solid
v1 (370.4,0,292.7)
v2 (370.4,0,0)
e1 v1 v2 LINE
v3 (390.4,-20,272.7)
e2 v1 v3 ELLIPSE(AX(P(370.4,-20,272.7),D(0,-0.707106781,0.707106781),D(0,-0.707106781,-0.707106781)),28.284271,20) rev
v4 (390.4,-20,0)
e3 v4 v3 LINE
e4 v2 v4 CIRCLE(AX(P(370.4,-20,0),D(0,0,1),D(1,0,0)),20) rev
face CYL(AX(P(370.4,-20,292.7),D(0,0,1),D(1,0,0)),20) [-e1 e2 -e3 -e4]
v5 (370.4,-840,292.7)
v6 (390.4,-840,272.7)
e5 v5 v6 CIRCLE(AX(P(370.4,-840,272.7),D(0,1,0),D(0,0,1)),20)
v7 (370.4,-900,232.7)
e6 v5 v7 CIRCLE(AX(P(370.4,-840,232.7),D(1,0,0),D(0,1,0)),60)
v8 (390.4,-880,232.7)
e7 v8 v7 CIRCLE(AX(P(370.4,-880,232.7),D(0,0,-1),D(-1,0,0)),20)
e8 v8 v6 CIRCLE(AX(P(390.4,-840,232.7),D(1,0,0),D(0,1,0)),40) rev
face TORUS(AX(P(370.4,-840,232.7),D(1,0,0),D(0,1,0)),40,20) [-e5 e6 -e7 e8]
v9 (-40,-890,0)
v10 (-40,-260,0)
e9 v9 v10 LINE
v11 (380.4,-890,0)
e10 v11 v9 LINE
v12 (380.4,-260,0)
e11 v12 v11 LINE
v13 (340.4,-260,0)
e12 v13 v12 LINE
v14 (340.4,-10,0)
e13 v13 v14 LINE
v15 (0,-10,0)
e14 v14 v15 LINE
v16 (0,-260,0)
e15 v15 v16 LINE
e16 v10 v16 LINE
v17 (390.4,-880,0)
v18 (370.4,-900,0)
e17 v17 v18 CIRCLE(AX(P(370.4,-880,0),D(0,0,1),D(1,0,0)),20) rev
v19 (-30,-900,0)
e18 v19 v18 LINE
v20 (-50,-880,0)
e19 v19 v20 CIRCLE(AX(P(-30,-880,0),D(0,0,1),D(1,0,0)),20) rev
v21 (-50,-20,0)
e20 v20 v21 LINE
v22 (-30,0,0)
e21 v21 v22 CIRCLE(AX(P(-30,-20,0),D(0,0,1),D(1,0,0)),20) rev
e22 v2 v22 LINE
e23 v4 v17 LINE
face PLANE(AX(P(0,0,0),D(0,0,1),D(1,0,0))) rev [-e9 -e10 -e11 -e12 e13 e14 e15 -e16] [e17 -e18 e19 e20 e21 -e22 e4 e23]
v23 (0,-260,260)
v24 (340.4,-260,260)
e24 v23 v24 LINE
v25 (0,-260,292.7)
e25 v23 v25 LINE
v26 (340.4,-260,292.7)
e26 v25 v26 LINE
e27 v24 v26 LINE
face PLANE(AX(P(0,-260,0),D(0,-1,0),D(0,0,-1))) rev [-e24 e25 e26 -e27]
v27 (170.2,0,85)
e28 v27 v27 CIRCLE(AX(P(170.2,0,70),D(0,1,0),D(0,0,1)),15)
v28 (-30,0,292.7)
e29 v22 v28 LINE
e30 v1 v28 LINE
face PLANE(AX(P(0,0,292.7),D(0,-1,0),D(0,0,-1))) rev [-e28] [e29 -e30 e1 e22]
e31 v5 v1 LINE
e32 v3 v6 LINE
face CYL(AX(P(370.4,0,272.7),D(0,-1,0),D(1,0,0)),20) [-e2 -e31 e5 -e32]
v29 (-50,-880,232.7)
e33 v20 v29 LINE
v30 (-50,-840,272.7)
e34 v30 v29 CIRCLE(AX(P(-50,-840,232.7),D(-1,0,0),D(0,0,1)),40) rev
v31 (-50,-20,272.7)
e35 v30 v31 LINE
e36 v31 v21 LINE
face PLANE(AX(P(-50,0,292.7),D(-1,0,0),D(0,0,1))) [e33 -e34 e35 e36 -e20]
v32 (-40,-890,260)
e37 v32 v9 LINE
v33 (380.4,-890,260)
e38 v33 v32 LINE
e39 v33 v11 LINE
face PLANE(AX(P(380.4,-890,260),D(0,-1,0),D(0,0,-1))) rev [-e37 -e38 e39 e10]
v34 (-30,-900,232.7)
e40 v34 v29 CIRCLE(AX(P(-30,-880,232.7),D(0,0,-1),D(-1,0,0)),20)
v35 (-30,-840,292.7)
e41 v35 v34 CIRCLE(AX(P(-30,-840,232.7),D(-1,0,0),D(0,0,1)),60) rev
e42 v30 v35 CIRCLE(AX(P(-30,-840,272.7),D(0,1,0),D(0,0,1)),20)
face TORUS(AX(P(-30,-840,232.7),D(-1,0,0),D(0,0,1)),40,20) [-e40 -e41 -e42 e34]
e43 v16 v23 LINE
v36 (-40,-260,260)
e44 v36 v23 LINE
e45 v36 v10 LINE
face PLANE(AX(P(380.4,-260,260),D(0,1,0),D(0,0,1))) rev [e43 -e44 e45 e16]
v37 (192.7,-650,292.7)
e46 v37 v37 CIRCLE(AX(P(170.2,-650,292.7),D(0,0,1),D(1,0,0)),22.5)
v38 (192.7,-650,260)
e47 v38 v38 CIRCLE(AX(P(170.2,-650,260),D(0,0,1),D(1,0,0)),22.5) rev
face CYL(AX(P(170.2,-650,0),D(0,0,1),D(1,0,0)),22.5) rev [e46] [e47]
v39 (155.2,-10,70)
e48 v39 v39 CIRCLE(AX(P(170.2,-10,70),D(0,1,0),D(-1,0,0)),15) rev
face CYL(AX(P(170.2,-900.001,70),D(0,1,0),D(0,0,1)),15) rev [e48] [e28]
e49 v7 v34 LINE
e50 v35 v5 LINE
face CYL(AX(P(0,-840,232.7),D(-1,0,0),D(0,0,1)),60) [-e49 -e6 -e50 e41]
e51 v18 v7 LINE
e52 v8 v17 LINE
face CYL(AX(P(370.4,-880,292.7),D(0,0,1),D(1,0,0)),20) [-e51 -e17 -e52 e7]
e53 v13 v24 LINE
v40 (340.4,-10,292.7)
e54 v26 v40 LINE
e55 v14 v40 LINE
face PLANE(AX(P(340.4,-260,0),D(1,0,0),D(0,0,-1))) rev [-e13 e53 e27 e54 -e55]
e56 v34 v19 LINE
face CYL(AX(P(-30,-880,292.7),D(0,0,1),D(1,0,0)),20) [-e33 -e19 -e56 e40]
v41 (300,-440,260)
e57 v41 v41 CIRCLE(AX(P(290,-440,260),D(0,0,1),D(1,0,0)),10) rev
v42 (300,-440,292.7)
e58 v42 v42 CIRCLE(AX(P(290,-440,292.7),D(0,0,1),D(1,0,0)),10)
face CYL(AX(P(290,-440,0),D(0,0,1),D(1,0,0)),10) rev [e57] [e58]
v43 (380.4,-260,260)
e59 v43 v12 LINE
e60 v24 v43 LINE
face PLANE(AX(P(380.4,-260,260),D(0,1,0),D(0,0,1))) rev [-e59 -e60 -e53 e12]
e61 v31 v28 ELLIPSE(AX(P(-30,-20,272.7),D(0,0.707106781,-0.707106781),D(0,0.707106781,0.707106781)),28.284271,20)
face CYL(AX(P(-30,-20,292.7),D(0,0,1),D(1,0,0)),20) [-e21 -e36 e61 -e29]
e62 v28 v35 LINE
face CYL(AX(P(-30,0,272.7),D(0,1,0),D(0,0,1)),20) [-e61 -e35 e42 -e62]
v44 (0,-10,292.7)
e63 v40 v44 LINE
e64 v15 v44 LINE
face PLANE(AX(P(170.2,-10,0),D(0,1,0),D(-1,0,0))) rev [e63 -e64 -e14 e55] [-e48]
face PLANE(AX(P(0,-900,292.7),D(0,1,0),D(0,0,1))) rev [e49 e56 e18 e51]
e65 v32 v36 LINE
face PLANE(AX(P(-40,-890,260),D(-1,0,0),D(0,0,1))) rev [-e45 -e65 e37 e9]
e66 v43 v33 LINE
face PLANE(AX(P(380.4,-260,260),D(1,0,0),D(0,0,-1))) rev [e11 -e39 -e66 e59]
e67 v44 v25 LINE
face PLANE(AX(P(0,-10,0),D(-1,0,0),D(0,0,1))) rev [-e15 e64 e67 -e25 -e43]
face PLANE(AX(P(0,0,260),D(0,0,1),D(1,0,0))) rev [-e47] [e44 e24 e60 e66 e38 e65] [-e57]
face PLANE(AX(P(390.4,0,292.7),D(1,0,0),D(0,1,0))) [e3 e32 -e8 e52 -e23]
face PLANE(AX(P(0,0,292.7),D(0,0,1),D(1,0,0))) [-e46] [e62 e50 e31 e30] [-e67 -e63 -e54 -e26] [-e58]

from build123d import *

# Parameters (mm, degrees)
SKETCH_1_W               = 340.4
SKETCH_1_H               = 900
EXTRUDE_1_DEPTH          = 292.7
SKETCH_2_R               = 22.5
CUT_EXTRUDE_1_DEPTH      = 1006.756158321
SKETCH_3_W               = 50
SKETCH_3_H               = 900
EXTRUDE_2_DEPTH          = 292.7
FILLET_9_R               = 20
FILLET_10_R              = 60
CUT_EXTRUDE_3_DEPTH      = 1024.760445612
CUT_EXTRUDE_3_DEPTH_BACK = 1024.760445612
SKETCH_5_R               = 10
CUT_EXTRUDE_4_REACH      = 1025.76
CUT_EXTRUDE_4_END_RADIUS = 22.5
SKETCH_6_R               = 15
SKETCH_7_W               = 420.4
SKETCH_7_H               = 630
CUT_EXTRUDE_6_DEPTH      = 260
CUT_EXTRUDE_7_DEPTH      = 1024.760445612


with BuildPart() as part:
    # 草图1 → 凸台-拉伸1 (new body)
    with BuildSketch(Plane.XY):
        with Locations((170.2, -450)):
            Rectangle(SKETCH_1_W, SKETCH_1_H)
    extrude(amount=EXTRUDE_1_DEPTH)

    # 草图2 → 切除-拉伸1 (cut, through all)
    with BuildSketch(Plane.XY.offset(292.7)):
        with Locations((170.2, -650)):
            Circle(SKETCH_2_R)
    extrude(amount=-CUT_EXTRUDE_1_DEPTH, mode=Mode.SUBTRACT)

    # 草图3 → 凸台-拉伸2 (add)
    with BuildSketch(Plane(origin=(0, 0, 0), x_dir=(-1, 0, 0), z_dir=(0, 0, -1))):
        with Locations((-365.4, -450)):
            Rectangle(SKETCH_3_W, SKETCH_3_H)
        with Locations((25, -450)):
            Rectangle(SKETCH_3_W, SKETCH_3_H)
    extrude(amount=-EXTRUDE_2_DEPTH)

    # 圆角9
    fillet_9_edges = [part.edges().sort_by_distance(p)[0] for p in [
        (390.4, -450, 292.7),
        (390.4, -900, 146.35),
        (390.4, 0, 146.35),
        (-50, -450, 292.7),
        (-50, 0, 146.35),
        (-50, -900, 146.35),
    ]]
    fillet(fillet_9_edges, radius=FILLET_9_R)

    # 圆角10
    # the kernel refuses this fillet: 60 mm, written as the material it takes off along each edge
    with BuildSketch(Plane(origin=(390.4, -840, 232.7), x_dir=(0, 0, 1), z_dir=(0, 1, 0))) as fillet_10_piece_1:
        with BuildLine():
            CenterArc((40, -20), 20, 0, 90)
            Line((60, -20), (60, 0))
            Line((60, 0), (40, 0))
        make_face()
    revolve(axis=Axis((390.4, -840, 232.7), (1, 0, 0)), revolution_arc=90, mode=Mode.SUBTRACT)
    with BuildSketch(Plane(origin=(-50, -840, 232.7), x_dir=(0, -1, 0), z_dir=(0, 0, -1))) as fillet_10_piece_2:
        with BuildLine():
            CenterArc((40, -20), 20, 0, 90)
            Line((60, -20), (60, 0))
            Line((60, 0), (40, 0))
        make_face()
    revolve(axis=Axis((-50, -840, 232.7), (-1, 0, 0)), revolution_arc=90, mode=Mode.SUBTRACT)
    with BuildSketch(Plane(origin=(-50, -900, 292.7), x_dir=(0, 1, 0), z_dir=(1, 0, 0))) as fillet_10_piece_3:
        with BuildLine():
            CenterArc((FILLET_10_R, -FILLET_10_R), FILLET_10_R, 90, 90)
            Line((0, -FILLET_10_R), (0, 0))
            Line((0, 0), (FILLET_10_R, 0))
        make_face()
    extrude(amount=440.4, mode=Mode.SUBTRACT)

    # 草图5 → 切除-拉伸3 (cut, two sides: drawn at the far end of the back side and taken through both)
    with BuildSketch(Plane.XY.offset(292.7).offset(-CUT_EXTRUDE_3_DEPTH_BACK)):
        with Locations((290, -440)):
            Circle(SKETCH_5_R)
    extrude(amount=CUT_EXTRUDE_3_DEPTH + CUT_EXTRUDE_3_DEPTH_BACK, mode=Mode.SUBTRACT)

    # 切除-拉伸4: up to this cylinder (the profile starts outside it)
    cut_extrude_4_end = Plane(origin=(170.2, -650, 70), z_dir=(0, 0, 1)) * Cylinder(CUT_EXTRUDE_4_END_RADIUS, 2097.52, mode=Mode.PRIVATE)
    # 草图6 → 切除-拉伸4 (cut, up to the surface)
    with BuildSketch(Plane(origin=(0, 0, 0), x_dir=(1, 0, 0), z_dir=(0, 1, 0)), mode=Mode.PRIVATE) as cut_extrude_4_sk1:
        with Locations(Location((170.2, -70, 0), (0, 0, 270))):
            Circle(SKETCH_6_R)
    cut_extrude_4_tool1 = extrude(cut_extrude_4_sk1.sketch, amount=-CUT_EXTRUDE_4_REACH, mode=Mode.PRIVATE) - cut_extrude_4_end
    add(cut_extrude_4_tool1.solids().sort_by_distance((170.2, 0, 70))[0], mode=Mode.SUBTRACT)

    # 草图7 → 切除-拉伸6 (cut)
    with BuildSketch(Plane(origin=(0, 0, 0), x_dir=(-1, 0, 0), z_dir=(0, 0, -1))):
        with Locations((-170.2, -575)):
            Rectangle(SKETCH_7_W, SKETCH_7_H)
    extrude(amount=-CUT_EXTRUDE_6_DEPTH, mode=Mode.SUBTRACT)

    # 草图8 → 切除-拉伸7 (cut, through all)
    with BuildSketch(Plane.XY.offset(292.7)):
        Polygon((170.2, -10), (0, -10), (0, -260), (340.4, -260), (340.4, -10), align=None)
    extrude(amount=-CUT_EXTRUDE_7_DEPTH, mode=Mode.SUBTRACT)


solid = part.part
